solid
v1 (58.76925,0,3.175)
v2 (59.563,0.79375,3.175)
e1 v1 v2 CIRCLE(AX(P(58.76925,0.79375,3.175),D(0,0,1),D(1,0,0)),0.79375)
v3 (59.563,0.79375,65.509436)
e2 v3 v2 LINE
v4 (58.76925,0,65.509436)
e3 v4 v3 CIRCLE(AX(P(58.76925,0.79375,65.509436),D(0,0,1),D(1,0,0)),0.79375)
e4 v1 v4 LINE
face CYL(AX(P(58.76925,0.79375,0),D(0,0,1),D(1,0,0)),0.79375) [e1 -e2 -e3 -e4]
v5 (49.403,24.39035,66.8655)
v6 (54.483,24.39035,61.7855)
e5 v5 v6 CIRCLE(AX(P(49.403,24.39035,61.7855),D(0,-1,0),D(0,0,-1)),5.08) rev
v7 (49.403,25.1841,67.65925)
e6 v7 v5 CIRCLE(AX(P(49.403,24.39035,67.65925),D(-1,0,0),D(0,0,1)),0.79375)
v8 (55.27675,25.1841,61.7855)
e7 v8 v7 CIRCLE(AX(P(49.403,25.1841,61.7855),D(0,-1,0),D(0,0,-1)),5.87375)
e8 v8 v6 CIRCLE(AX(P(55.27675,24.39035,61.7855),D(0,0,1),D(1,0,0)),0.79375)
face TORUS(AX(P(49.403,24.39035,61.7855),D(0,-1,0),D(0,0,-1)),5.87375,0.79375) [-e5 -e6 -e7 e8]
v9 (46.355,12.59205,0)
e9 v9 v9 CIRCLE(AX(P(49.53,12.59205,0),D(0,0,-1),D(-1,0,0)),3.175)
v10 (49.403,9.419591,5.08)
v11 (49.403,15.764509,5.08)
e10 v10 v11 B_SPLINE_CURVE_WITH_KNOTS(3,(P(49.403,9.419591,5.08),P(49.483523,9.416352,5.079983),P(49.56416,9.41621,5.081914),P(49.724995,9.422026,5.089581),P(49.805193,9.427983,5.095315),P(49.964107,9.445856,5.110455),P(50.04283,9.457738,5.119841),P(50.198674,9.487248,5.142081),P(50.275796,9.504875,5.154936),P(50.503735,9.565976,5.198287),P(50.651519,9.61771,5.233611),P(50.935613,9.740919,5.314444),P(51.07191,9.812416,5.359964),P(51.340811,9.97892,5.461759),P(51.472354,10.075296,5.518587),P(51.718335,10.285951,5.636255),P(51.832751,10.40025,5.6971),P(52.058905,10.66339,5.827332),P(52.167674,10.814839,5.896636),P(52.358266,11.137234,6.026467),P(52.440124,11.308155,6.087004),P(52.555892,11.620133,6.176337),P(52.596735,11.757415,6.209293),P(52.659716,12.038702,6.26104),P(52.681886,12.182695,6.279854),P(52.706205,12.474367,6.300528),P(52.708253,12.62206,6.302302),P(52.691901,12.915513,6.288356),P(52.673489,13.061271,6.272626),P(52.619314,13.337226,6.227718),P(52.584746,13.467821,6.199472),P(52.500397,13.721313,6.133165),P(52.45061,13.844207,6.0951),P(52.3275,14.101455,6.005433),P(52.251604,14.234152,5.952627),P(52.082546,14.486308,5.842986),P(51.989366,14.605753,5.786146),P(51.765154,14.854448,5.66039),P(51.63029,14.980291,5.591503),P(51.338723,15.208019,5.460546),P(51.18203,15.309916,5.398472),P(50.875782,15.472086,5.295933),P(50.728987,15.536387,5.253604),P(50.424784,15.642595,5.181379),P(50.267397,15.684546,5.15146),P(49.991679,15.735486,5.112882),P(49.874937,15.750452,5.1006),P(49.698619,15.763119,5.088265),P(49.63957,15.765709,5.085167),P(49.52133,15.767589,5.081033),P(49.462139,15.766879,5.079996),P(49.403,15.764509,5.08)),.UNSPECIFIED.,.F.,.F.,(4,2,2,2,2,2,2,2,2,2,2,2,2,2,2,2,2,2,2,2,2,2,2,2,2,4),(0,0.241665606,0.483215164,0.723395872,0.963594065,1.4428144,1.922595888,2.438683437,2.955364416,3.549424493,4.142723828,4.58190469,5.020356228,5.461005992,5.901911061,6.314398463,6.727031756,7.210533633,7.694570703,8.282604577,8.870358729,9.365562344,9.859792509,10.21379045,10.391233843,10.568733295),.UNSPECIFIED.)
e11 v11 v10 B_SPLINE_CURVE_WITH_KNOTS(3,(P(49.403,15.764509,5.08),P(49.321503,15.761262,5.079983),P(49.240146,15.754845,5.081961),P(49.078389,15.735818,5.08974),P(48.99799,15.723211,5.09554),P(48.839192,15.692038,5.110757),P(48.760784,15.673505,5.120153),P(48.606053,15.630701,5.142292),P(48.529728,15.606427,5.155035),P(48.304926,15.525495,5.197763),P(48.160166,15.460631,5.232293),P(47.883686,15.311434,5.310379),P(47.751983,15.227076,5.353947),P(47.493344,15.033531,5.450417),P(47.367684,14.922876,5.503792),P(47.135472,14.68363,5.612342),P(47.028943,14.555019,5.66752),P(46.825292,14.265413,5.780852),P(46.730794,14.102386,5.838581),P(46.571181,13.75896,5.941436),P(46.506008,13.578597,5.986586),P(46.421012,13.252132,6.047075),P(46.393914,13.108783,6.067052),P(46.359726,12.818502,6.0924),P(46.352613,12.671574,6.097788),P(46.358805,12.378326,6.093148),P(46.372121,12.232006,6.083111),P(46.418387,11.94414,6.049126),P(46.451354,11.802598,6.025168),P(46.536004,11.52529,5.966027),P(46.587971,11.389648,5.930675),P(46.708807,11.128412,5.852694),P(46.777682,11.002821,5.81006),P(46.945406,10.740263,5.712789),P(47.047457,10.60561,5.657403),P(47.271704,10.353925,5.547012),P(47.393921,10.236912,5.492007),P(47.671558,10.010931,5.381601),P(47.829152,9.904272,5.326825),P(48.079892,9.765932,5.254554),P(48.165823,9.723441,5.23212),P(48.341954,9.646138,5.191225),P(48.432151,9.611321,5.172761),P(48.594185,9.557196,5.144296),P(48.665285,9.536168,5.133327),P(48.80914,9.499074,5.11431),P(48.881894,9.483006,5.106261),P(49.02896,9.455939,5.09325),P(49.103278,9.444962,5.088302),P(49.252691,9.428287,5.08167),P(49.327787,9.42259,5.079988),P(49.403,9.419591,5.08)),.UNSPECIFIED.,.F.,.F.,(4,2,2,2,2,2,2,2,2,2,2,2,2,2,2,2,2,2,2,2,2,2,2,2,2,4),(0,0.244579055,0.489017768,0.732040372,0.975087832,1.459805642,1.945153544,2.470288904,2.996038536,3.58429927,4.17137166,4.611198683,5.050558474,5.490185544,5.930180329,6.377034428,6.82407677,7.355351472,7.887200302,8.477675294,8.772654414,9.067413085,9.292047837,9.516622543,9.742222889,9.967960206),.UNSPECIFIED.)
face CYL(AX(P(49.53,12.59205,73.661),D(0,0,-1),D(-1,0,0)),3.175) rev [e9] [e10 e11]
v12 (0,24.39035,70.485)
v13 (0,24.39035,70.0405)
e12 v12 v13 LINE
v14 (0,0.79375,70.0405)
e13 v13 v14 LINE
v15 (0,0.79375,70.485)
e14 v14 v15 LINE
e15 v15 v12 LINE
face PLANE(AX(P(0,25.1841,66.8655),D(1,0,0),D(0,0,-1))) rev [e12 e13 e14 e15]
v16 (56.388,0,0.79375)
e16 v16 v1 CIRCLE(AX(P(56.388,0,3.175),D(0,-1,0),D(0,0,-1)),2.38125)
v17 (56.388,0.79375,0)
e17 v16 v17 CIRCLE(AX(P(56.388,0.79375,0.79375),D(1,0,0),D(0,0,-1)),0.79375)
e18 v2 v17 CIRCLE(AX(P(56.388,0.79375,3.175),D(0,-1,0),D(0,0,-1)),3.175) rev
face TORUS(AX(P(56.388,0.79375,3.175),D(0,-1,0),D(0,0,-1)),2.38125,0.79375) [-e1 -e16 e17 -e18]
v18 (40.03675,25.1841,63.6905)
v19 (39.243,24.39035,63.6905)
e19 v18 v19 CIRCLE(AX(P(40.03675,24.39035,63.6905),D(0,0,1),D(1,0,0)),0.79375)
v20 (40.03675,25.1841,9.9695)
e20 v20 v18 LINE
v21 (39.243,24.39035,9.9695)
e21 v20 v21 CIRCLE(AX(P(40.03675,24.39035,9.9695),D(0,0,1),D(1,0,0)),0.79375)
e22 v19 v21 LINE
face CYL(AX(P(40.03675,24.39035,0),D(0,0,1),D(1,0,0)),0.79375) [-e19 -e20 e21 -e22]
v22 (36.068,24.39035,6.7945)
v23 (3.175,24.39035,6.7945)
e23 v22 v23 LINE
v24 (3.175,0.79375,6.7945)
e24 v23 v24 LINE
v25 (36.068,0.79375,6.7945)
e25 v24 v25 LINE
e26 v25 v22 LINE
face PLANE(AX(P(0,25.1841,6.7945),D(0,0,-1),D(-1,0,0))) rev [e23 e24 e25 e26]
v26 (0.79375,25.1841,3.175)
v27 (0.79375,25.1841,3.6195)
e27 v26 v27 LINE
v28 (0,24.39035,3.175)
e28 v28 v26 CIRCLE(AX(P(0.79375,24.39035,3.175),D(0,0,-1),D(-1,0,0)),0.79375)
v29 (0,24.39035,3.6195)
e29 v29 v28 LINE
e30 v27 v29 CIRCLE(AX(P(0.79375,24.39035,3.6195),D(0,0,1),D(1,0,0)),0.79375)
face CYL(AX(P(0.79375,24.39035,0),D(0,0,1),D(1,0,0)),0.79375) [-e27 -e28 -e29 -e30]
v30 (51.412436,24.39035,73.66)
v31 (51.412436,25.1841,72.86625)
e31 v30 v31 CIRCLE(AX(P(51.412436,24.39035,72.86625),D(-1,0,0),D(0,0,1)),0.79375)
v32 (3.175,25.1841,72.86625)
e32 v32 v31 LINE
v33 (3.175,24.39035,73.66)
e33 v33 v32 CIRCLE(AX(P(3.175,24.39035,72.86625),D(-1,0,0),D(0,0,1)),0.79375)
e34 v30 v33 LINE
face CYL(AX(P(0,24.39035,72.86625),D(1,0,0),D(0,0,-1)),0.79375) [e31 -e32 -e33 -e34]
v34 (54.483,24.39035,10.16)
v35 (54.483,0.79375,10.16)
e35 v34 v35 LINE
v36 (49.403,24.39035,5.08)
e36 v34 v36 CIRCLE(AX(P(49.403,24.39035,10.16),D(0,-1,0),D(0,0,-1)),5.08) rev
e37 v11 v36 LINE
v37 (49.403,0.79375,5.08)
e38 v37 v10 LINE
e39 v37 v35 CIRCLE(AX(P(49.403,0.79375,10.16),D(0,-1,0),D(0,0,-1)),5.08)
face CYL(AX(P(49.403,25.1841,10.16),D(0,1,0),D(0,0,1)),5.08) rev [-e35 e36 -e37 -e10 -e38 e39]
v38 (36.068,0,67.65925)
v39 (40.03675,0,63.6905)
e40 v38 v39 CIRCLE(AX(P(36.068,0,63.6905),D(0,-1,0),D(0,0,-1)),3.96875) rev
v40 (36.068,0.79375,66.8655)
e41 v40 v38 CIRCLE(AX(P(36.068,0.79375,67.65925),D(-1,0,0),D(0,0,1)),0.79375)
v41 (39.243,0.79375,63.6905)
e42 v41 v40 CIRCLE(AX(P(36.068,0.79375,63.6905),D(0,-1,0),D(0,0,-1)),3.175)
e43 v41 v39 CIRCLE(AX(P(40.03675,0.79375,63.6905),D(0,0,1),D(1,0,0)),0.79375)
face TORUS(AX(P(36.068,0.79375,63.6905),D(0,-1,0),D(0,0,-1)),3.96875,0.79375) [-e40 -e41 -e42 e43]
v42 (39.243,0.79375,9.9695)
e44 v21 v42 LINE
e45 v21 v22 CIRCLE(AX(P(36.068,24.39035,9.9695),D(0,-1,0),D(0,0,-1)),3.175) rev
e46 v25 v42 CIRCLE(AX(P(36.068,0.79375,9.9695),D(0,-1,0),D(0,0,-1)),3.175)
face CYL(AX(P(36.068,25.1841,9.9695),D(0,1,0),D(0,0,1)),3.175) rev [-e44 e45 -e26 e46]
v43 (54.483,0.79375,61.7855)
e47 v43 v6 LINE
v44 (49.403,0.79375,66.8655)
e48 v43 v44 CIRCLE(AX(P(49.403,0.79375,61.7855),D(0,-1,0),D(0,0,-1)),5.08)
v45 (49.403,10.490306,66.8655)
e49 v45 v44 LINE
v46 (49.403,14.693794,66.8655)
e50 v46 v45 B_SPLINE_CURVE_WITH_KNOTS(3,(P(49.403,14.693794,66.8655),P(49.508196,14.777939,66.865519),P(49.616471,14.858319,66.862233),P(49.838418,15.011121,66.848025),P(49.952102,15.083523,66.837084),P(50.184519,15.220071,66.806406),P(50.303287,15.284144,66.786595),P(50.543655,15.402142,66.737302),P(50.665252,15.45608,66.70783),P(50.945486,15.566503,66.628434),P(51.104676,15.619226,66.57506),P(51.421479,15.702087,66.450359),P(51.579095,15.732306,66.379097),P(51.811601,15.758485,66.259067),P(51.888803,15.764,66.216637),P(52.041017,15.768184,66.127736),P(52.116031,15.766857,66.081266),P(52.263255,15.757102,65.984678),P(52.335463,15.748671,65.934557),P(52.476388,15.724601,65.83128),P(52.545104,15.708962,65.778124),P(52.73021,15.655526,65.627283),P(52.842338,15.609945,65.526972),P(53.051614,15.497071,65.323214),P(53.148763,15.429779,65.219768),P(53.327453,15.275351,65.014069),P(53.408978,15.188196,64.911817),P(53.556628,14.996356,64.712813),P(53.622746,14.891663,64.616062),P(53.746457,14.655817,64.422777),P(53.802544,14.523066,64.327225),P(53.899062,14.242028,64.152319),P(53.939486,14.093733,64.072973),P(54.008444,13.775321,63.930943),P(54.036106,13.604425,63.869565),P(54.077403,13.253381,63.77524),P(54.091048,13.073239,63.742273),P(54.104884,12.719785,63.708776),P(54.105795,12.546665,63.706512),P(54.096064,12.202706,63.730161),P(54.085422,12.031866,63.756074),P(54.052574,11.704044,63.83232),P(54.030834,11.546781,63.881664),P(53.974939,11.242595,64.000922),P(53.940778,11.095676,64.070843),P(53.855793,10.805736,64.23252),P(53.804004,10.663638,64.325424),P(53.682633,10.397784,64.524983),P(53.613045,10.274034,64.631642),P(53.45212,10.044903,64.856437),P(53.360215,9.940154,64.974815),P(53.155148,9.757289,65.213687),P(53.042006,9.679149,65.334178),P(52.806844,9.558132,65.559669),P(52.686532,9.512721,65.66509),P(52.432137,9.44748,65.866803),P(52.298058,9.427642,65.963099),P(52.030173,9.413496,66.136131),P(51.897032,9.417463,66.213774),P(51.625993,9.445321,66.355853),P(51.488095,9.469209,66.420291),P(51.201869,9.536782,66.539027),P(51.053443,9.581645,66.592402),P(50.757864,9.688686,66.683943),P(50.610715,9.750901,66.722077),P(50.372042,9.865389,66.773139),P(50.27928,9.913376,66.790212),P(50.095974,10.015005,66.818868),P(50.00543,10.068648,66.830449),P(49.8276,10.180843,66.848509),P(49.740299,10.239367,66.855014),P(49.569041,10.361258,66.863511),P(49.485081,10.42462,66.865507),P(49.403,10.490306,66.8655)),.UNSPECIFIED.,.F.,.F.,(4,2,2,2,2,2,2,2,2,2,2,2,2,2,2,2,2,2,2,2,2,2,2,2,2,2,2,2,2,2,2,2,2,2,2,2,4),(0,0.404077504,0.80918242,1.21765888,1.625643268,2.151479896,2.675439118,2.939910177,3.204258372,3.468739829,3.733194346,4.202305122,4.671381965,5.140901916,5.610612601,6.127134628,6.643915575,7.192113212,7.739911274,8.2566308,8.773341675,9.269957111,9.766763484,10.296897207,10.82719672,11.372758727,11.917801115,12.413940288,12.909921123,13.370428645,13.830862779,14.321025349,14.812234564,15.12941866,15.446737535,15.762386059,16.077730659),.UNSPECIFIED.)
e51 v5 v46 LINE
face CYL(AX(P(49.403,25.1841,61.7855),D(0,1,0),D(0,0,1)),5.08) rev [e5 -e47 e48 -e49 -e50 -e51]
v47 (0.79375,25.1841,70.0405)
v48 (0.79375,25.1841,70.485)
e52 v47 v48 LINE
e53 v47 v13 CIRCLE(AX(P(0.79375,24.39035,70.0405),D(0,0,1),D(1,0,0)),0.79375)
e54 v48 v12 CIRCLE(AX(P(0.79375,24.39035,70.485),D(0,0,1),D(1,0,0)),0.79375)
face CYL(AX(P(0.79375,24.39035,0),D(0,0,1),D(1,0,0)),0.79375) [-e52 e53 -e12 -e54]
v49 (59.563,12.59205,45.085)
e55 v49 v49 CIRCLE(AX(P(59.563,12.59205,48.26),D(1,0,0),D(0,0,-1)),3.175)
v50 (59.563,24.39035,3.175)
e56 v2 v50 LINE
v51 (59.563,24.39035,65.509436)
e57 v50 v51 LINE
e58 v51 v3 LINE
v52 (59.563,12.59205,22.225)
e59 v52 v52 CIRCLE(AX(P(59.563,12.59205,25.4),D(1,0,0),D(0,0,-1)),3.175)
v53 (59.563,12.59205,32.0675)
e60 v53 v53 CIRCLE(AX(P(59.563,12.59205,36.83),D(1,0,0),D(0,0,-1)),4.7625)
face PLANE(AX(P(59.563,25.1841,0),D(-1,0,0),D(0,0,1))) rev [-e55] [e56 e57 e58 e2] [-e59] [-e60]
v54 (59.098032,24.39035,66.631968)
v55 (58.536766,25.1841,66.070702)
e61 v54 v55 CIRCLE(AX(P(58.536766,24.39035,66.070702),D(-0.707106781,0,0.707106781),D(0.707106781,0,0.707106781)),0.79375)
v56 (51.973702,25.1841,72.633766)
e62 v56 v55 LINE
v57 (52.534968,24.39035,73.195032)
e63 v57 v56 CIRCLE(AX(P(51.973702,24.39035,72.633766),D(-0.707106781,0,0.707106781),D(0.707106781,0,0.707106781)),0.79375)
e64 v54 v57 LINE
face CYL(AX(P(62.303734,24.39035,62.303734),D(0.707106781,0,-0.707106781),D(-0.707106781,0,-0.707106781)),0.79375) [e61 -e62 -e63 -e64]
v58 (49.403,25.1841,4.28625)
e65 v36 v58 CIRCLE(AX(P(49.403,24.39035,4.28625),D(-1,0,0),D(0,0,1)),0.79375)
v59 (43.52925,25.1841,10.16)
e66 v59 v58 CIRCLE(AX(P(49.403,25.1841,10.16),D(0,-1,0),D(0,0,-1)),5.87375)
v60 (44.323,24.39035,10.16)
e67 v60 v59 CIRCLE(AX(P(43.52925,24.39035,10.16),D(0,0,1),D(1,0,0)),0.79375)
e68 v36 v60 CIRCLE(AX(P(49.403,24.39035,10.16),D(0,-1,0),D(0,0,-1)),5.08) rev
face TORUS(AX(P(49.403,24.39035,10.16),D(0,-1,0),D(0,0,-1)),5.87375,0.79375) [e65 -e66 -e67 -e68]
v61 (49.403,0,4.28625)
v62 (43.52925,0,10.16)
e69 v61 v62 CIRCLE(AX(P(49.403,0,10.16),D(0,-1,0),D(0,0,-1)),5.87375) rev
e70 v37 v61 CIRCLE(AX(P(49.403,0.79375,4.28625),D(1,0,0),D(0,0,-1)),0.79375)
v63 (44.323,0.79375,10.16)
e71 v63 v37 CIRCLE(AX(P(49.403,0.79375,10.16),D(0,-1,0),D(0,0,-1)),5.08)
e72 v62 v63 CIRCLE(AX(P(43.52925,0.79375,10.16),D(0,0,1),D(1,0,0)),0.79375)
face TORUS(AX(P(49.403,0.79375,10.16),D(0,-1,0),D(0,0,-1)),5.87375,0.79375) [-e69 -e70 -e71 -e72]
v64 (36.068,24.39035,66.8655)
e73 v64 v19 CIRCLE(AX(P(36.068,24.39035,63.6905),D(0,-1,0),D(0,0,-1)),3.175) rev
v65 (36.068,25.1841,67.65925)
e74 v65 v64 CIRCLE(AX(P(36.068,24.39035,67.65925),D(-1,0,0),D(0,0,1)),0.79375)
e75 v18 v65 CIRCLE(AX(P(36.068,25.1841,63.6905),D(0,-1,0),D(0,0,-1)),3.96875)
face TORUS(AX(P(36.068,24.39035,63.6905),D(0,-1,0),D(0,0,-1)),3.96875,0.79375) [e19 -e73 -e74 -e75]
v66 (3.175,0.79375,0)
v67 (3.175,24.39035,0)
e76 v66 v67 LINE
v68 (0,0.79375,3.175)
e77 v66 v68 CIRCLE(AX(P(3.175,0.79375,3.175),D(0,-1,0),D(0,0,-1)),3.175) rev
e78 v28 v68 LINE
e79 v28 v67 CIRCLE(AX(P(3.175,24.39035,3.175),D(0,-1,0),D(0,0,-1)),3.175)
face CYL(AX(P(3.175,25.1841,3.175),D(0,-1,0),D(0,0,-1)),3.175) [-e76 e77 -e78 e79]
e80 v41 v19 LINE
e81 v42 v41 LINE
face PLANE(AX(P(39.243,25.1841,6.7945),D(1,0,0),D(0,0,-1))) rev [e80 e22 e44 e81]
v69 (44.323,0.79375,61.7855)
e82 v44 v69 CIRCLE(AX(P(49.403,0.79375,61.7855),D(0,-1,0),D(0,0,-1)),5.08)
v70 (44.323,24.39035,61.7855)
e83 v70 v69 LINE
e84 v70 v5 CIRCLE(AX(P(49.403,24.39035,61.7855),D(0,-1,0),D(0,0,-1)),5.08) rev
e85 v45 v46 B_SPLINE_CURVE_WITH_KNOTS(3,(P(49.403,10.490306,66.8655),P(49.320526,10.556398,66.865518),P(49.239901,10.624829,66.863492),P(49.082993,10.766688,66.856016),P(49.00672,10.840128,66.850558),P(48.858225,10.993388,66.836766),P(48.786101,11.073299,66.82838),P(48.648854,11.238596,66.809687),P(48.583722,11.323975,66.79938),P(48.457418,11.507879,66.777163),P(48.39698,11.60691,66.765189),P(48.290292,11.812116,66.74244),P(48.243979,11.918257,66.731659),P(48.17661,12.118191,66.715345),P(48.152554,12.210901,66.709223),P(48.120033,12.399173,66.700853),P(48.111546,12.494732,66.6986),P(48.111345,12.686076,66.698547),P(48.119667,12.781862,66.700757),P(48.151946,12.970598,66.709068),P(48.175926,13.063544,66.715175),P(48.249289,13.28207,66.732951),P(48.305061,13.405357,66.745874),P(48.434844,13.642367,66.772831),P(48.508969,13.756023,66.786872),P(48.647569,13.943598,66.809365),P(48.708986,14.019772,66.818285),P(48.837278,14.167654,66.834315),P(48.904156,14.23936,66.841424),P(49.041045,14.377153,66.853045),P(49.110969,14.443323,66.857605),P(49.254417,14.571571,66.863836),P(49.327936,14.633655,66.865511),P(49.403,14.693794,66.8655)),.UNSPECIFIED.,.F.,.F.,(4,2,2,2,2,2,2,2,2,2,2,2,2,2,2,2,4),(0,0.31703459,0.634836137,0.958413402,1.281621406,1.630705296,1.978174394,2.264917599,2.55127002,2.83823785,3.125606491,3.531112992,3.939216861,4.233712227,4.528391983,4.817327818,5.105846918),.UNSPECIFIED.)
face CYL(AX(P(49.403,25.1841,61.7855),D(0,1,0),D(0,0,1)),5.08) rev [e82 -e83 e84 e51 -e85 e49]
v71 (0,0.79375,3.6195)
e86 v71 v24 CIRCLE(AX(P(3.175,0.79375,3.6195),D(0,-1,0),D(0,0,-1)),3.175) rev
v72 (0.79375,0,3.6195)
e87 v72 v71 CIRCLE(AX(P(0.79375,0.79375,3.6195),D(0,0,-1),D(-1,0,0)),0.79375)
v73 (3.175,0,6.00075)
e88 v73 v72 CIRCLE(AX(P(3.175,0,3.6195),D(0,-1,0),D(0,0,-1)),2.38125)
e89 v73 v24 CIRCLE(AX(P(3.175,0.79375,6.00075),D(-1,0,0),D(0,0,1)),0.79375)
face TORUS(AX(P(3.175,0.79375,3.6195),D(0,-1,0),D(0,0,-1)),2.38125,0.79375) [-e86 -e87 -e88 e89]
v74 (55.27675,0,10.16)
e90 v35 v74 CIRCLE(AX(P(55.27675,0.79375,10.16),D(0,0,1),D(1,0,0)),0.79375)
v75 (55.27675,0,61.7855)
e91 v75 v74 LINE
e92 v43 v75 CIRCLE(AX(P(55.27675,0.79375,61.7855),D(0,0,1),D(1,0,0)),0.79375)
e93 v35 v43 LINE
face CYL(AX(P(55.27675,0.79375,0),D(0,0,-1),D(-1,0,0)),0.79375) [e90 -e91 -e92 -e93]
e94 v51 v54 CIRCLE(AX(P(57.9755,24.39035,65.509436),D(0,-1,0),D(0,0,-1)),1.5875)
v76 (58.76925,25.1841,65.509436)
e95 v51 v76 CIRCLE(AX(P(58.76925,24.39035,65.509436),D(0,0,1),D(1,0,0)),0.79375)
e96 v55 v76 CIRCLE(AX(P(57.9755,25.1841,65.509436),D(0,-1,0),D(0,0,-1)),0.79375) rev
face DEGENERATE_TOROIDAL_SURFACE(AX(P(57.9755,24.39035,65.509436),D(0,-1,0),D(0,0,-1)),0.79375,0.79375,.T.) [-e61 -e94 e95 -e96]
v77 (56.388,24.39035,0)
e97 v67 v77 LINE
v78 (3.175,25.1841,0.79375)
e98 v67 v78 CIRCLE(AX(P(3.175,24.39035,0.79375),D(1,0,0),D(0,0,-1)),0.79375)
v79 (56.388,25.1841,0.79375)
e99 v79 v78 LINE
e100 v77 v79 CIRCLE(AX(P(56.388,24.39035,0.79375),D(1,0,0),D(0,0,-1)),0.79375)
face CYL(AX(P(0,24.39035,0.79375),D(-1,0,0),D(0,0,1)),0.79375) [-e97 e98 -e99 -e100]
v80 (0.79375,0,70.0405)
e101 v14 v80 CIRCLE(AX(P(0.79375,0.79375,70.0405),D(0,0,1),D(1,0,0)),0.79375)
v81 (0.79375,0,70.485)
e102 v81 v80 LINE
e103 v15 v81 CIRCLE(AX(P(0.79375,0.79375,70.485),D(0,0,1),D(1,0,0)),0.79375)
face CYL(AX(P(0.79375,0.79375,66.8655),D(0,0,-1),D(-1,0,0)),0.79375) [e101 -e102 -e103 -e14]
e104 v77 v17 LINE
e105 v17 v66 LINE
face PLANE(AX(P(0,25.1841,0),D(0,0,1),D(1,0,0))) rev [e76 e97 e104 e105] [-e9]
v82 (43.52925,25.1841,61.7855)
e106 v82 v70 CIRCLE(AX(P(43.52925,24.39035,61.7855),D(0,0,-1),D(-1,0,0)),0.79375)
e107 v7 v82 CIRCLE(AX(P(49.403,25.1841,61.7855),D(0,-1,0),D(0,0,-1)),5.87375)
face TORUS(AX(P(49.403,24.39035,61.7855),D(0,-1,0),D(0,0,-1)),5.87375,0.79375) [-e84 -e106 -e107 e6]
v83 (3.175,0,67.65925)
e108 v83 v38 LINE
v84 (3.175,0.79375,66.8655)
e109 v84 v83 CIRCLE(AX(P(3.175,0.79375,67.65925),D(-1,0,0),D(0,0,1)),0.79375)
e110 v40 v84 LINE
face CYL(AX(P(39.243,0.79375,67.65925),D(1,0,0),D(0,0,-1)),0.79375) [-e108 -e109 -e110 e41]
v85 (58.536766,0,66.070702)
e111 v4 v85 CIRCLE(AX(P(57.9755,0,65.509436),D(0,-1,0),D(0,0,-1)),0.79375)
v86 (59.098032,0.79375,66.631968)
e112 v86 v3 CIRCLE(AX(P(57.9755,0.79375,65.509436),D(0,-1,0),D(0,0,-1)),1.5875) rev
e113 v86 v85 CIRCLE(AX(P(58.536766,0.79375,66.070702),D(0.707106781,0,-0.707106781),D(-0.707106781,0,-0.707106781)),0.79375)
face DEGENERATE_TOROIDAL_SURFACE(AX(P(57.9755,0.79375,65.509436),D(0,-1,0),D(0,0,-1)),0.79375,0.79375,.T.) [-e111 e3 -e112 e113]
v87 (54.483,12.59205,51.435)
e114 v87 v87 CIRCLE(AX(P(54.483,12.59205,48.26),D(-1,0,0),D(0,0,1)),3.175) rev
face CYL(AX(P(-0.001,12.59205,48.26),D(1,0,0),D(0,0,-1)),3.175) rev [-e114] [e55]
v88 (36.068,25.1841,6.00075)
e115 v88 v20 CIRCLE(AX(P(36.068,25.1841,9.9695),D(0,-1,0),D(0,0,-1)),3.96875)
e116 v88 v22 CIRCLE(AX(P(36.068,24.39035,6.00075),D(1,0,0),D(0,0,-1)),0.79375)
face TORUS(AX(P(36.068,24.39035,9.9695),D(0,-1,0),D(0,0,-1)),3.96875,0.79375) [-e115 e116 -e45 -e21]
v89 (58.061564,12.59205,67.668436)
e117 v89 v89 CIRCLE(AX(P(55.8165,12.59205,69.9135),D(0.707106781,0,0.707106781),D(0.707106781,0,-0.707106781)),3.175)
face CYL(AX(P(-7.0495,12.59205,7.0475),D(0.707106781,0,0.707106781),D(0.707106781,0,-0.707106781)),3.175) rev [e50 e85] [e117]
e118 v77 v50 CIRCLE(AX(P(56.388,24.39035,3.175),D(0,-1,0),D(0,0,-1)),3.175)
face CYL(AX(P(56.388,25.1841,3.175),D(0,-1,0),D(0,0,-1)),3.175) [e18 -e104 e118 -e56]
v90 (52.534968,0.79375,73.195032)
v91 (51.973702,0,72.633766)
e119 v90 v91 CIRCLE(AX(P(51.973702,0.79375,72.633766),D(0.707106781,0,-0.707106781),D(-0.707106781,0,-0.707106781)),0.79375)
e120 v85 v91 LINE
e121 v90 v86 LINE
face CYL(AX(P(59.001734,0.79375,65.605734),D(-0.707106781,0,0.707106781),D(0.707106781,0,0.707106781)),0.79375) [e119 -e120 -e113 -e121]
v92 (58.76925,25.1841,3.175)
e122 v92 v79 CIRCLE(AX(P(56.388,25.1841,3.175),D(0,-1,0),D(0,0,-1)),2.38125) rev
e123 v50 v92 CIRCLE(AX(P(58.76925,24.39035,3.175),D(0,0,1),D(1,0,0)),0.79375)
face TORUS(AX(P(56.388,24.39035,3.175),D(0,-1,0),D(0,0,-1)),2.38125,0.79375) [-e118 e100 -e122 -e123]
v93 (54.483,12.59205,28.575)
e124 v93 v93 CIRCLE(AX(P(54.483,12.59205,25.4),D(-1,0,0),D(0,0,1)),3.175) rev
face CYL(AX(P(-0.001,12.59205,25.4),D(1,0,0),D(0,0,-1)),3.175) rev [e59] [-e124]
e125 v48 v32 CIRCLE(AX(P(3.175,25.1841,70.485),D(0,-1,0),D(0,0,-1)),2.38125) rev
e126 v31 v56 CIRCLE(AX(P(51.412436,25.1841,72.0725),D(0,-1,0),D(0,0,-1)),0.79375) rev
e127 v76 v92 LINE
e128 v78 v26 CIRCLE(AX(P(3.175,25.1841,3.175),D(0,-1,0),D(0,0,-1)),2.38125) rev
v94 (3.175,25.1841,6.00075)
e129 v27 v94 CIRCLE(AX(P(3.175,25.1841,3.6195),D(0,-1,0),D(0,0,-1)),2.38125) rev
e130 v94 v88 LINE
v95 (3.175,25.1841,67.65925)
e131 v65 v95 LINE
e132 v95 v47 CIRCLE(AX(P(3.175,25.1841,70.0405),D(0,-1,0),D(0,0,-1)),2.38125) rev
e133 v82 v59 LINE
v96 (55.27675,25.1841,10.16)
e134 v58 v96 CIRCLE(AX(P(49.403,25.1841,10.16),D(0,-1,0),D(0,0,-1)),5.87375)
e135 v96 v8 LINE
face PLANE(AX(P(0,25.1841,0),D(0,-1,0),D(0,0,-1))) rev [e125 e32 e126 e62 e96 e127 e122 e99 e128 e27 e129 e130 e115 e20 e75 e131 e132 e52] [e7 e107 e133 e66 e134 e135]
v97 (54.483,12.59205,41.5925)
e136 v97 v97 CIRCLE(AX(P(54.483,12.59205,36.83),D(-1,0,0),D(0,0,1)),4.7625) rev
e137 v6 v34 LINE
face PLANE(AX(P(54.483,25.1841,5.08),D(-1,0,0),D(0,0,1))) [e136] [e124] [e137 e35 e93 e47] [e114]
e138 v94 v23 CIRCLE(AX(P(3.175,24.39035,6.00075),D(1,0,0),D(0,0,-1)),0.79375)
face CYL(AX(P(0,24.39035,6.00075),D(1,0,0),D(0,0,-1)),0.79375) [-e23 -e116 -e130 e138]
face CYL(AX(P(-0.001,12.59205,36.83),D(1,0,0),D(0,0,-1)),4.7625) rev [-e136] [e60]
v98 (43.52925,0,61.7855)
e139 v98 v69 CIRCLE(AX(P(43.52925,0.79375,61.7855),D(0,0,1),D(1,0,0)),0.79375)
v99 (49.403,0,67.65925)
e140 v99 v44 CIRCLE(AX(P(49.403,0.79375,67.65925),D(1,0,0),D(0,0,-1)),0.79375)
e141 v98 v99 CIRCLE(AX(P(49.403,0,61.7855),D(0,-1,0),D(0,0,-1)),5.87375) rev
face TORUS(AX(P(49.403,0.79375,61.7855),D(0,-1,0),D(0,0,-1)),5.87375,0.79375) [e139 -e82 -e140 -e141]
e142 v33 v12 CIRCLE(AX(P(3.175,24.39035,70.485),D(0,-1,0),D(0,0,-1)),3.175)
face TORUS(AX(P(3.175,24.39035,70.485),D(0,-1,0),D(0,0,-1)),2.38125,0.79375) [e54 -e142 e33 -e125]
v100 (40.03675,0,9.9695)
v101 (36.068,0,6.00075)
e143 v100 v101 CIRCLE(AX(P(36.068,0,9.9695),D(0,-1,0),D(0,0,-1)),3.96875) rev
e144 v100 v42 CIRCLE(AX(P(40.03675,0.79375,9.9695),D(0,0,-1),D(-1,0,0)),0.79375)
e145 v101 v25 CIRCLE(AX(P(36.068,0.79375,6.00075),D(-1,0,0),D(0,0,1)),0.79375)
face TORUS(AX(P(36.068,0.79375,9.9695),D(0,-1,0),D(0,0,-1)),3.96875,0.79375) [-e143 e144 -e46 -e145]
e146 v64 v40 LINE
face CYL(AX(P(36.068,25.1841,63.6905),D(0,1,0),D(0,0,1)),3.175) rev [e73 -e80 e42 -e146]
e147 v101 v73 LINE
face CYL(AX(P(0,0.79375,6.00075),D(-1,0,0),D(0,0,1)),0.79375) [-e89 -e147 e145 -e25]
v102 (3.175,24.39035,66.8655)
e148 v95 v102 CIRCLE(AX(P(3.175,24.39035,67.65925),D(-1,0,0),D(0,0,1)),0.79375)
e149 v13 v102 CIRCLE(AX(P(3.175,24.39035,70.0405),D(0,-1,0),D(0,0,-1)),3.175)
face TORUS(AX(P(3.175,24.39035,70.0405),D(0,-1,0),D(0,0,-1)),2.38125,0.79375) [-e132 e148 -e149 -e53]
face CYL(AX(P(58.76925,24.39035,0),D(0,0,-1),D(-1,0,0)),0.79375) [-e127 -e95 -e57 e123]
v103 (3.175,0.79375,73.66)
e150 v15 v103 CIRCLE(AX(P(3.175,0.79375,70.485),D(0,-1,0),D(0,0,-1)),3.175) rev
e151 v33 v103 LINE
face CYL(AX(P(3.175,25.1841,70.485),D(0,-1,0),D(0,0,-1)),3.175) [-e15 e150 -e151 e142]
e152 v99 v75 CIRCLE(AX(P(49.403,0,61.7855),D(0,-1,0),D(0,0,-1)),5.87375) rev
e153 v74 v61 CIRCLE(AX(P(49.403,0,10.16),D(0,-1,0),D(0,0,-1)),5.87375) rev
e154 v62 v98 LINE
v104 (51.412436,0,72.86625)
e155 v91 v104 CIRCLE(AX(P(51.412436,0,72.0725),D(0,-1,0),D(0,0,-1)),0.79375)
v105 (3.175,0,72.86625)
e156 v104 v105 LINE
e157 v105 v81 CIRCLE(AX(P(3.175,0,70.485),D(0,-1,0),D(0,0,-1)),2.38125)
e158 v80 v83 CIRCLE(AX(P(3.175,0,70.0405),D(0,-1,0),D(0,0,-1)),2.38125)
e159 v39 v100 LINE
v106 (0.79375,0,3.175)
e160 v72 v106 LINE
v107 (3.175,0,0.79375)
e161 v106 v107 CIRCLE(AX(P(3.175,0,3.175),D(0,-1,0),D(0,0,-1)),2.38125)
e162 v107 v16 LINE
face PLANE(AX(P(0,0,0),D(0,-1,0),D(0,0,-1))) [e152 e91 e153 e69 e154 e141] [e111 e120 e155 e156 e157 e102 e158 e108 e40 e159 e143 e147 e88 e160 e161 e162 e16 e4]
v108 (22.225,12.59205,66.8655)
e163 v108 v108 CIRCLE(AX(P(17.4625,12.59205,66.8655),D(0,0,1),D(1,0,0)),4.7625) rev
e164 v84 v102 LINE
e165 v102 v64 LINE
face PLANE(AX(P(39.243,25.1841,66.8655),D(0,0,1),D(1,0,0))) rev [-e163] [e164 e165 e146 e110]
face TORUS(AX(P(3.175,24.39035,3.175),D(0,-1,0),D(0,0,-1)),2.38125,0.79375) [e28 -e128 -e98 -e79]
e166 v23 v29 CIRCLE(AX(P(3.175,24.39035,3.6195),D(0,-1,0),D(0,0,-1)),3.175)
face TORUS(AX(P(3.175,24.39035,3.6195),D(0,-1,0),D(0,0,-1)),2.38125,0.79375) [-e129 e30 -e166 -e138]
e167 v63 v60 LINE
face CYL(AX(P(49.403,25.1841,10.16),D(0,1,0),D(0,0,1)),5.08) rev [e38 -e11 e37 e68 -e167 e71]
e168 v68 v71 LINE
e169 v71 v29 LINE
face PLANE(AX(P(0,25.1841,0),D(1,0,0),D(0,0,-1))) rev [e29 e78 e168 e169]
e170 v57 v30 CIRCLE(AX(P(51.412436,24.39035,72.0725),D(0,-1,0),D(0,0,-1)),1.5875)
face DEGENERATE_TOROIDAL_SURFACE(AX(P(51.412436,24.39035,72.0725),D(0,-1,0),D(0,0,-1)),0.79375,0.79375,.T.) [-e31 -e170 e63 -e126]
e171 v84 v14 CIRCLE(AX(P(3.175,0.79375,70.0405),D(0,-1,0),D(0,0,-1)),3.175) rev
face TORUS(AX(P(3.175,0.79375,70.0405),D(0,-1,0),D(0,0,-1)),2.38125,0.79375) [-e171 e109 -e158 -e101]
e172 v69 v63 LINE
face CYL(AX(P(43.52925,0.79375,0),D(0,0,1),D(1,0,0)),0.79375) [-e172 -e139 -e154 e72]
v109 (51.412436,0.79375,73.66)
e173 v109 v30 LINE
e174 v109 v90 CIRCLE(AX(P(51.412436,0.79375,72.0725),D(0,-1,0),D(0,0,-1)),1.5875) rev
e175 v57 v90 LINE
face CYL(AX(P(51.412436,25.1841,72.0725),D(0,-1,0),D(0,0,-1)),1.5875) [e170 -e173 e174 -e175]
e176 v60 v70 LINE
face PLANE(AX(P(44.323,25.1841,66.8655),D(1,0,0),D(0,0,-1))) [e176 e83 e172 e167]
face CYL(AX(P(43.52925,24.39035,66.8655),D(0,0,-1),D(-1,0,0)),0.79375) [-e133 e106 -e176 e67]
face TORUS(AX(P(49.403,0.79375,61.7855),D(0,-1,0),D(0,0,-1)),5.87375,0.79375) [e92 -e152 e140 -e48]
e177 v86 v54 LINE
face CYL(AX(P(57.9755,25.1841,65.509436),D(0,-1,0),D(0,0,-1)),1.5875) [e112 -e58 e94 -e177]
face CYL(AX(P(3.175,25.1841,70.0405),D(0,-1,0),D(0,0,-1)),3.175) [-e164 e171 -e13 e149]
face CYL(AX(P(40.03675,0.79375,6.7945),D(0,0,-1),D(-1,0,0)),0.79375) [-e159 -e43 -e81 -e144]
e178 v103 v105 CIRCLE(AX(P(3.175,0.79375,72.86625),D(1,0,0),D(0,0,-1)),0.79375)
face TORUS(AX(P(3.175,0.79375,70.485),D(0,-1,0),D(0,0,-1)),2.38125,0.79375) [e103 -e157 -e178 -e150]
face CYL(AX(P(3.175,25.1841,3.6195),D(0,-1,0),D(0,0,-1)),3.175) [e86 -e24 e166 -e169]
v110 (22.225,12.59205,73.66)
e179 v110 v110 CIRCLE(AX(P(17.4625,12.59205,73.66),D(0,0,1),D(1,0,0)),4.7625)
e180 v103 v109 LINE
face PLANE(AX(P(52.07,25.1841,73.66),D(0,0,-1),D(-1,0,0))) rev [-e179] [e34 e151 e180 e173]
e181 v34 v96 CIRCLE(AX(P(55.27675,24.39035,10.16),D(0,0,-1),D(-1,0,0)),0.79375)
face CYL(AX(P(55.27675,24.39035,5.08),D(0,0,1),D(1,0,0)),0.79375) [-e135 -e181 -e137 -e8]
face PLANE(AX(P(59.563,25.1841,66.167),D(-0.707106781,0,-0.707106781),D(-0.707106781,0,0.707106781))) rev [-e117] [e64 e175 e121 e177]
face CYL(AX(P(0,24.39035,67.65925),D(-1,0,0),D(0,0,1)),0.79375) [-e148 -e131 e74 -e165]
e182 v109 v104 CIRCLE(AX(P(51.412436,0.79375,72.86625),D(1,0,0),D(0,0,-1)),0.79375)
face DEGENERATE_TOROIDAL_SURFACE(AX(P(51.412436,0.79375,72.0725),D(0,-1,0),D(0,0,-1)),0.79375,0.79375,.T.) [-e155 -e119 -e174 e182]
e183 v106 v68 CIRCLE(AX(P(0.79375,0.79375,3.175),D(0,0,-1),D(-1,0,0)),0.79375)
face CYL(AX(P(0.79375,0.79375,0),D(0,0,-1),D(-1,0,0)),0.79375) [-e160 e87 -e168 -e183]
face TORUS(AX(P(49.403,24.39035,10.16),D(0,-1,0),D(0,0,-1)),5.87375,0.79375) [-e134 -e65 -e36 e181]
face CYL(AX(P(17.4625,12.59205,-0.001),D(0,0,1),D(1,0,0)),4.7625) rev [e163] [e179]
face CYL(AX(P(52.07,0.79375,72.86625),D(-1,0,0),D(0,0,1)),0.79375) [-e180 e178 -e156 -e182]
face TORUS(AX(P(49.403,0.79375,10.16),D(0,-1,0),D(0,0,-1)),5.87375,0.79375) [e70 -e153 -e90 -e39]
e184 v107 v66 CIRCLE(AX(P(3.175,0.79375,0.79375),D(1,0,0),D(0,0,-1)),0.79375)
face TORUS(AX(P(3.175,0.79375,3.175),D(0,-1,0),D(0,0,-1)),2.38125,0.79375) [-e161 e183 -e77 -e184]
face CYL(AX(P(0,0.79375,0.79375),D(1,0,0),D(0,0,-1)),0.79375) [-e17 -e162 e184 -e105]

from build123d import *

# Parameters (mm, degrees)
SKETCH1_W               = 10.16
SKETCH1_H               = 61.7855
BOSS_EXTRUDE1_DEPTH     = 25.1841
FILLET2_R               = 5.08
CUT_EXTRUDE1_REACH      = 100.019
SKETCH2_R               = 4.7625
CUT_EXTRUDE2_REACH      = 94.403
CUT_EXTRUDE2_END_RADIUS = 5.08
SKETCH3_R               = 3.175
CUT_EXTRUDE3_REACH      = 100.019
CUT_EXTRUDE4_REACH      = 100.019
CUT_EXTRUDE4_END_RADIUS = 5.08
SKETCH6_R               = 3.175
FILLET3_R               = 3.175
FILLET4_R               = 1.5875
FILLET5_R               = 0.79375


with BuildPart() as part:
    # Sketch1 → Boss-Extrude1 (new body)
    with BuildSketch(Plane(origin=(0, 0, 0), x_dir=(1, 0, 0), z_dir=(0, 1, 0))):
        Polygon((0, 0), (0, -6.7945), (39.243, -6.7945), (39.243, -66.8655), (0, -66.8655), (0, -73.66), (52.07, -73.66), (59.563, -66.167), (59.563, 0), align=None)
        with Locations((49.403, -35.97275)):
            Rectangle(SKETCH1_W, SKETCH1_H, mode=Mode.SUBTRACT)
    extrude(amount=BOSS_EXTRUDE1_DEPTH)

    # Fillet2
    fillet2_edges = [part.edges().sort_by_distance(p)[0] for p in [
        (44.323, 12.59205, 5.08),
        (54.483, 12.59205, 5.08),
        (44.323, 12.59205, 66.8655),
        (54.483, 12.59205, 66.8655),
    ]]
    fillet(fillet2_edges, radius=FILLET2_R - 0.0001)  # a hair under: the kernel refuses the full size

    # Sketch2 → Cut-Extrude1 (cut, up to next)
    with BuildSketch(Plane.XY.offset(73.66), mode=Mode.PRIVATE) as cut_extrude1_sk1:
        with Locations((17.4625, 12.59205)):
            Circle(SKETCH2_R)
    cut_extrude1_tool1 = extrude(cut_extrude1_sk1.sketch, amount=-CUT_EXTRUDE1_REACH, mode=Mode.PRIVATE) & part.part
    add(cut_extrude1_tool1.solids().sort_by_distance((17.4625, 12.59205, 73.66))[0], mode=Mode.SUBTRACT)

    # Cut-Extrude2: up to this cylinder (the profile starts outside it)
    cut_extrude2_end = Plane(origin=(49.403, 12.59205, 61.7855), z_dir=(0, 1, 0)) * Cylinder(CUT_EXTRUDE2_END_RADIUS, 199.966, mode=Mode.PRIVATE)
    # Sketch3 → Cut-Extrude2 (cut, up to the surface)
    with BuildSketch(Plane(origin=(62.865, 0, 62.865), x_dir=(0.707106781186546, 0, -0.707106781186549), z_dir=(0.707106781186549, 0, 0.707106781186546)), mode=Mode.PRIVATE) as cut_extrude2_sk1:
        with Locations((-9.968084294, 12.59205)):
            Circle(SKETCH3_R)
    cut_extrude2_tool1 = extrude(cut_extrude2_sk1.sketch, amount=-CUT_EXTRUDE2_REACH, mode=Mode.PRIVATE) - cut_extrude2_end
    add(cut_extrude2_tool1.solids().sort_by_distance((55.8165, 12.59205, 69.9135))[0], mode=Mode.SUBTRACT)

    # Sketch4 → Cut-Extrude3 (cut, up to next)
    with BuildSketch(Plane(origin=(59.563, 0, 0), x_dir=(0, 0, -1), z_dir=(1, 0, 0)), mode=Mode.PRIVATE) as cut_extrude3_sk1:
        with BuildLine():
            ThreePointArc((-41.5925, 12.59205), (-36.83, 7.82955), (-32.0675, 12.59205))
            Line((-32.0675, 12.59205), (-41.5925, 12.59205))
        make_face()
    cut_extrude3_tool1 = extrude(cut_extrude3_sk1.sketch, amount=-CUT_EXTRUDE3_REACH, mode=Mode.PRIVATE) & part.part
    # Sketch4 → Cut-Extrude3 (cut, up to next)
    with BuildSketch(Plane(origin=(59.563, 0, 0), x_dir=(0, 0, -1), z_dir=(1, 0, 0)), mode=Mode.PRIVATE) as cut_extrude3_sk2:
        with BuildLine():
            Line((-41.5925, 12.59205), (-32.0675, 12.59205))
            ThreePointArc((-32.0675, 12.59205), (-36.83, 17.35455), (-41.5925, 12.59205))
        make_face()
    cut_extrude3_tool2 = extrude(cut_extrude3_sk2.sketch, amount=-CUT_EXTRUDE3_REACH, mode=Mode.PRIVATE) & part.part
    # Sketch4 → Cut-Extrude3 (cut, up to next)
    with BuildSketch(Plane(origin=(59.563, 0, 0), x_dir=(0, 0, -1), z_dir=(1, 0, 0)), mode=Mode.PRIVATE) as cut_extrude3_sk3:
        with BuildLine():
            ThreePointArc((-41.5925, 12.59205), (-36.83, 7.82955), (-32.0675, 12.59205))
            Line((-32.0675, 12.59205), (-41.5925, 12.59205))
        make_face()
    cut_extrude3_tool3 = extrude(cut_extrude3_sk3.sketch, amount=-CUT_EXTRUDE3_REACH, mode=Mode.PRIVATE) & part.part
    # Sketch4 → Cut-Extrude3 (cut, up to next)
    with BuildSketch(Plane(origin=(59.563, 0, 0), x_dir=(0, 0, -1), z_dir=(1, 0, 0)), mode=Mode.PRIVATE) as cut_extrude3_sk4:
        with BuildLine():
            Line((-41.5925, 12.59205), (-32.0675, 12.59205))
            ThreePointArc((-32.0675, 12.59205), (-36.83, 17.35455), (-41.5925, 12.59205))
        make_face()
    cut_extrude3_tool4 = extrude(cut_extrude3_sk4.sketch, amount=-CUT_EXTRUDE3_REACH, mode=Mode.PRIVATE) & part.part
    # Sketch4 → Cut-Extrude3 (cut, up to next)
    with BuildSketch(Plane(origin=(59.563, 0, 0), x_dir=(0, 0, -1), z_dir=(1, 0, 0)), mode=Mode.PRIVATE) as cut_extrude3_sk5:
        with BuildLine():
            ThreePointArc((-28.575, 12.59205), (-25.4, 9.41705), (-22.225, 12.59205))
            Line((-22.225, 12.59205), (-28.575, 12.59205))
        make_face()
    cut_extrude3_tool5 = extrude(cut_extrude3_sk5.sketch, amount=-CUT_EXTRUDE3_REACH, mode=Mode.PRIVATE) & part.part
    # Sketch4 → Cut-Extrude3 (cut, up to next)
    with BuildSketch(Plane(origin=(59.563, 0, 0), x_dir=(0, 0, -1), z_dir=(1, 0, 0)), mode=Mode.PRIVATE) as cut_extrude3_sk6:
        with BuildLine():
            Line((-28.575, 12.59205), (-22.225, 12.59205))
            ThreePointArc((-22.225, 12.59205), (-25.4, 15.76705), (-28.575, 12.59205))
        make_face()
    cut_extrude3_tool6 = extrude(cut_extrude3_sk6.sketch, amount=-CUT_EXTRUDE3_REACH, mode=Mode.PRIVATE) & part.part
    # Sketch4 → Cut-Extrude3 (cut, up to next)
    with BuildSketch(Plane(origin=(59.563, 0, 0), x_dir=(0, 0, -1), z_dir=(1, 0, 0)), mode=Mode.PRIVATE) as cut_extrude3_sk7:
        with BuildLine():
            ThreePointArc((-28.575, 12.59205), (-25.4, 9.41705), (-22.225, 12.59205))
            Line((-22.225, 12.59205), (-28.575, 12.59205))
        make_face()
    cut_extrude3_tool7 = extrude(cut_extrude3_sk7.sketch, amount=-CUT_EXTRUDE3_REACH, mode=Mode.PRIVATE) & part.part
    # Sketch4 → Cut-Extrude3 (cut, up to next)
    with BuildSketch(Plane(origin=(59.563, 0, 0), x_dir=(0, 0, -1), z_dir=(1, 0, 0)), mode=Mode.PRIVATE) as cut_extrude3_sk8:
        with BuildLine():
            Line((-28.575, 12.59205), (-22.225, 12.59205))
            ThreePointArc((-22.225, 12.59205), (-25.4, 15.76705), (-28.575, 12.59205))
        make_face()
    cut_extrude3_tool8 = extrude(cut_extrude3_sk8.sketch, amount=-CUT_EXTRUDE3_REACH, mode=Mode.PRIVATE) & part.part
    # Sketch4 → Cut-Extrude3 (cut, up to next)
    with BuildSketch(Plane(origin=(59.563, 0, 0), x_dir=(0, 0, -1), z_dir=(1, 0, 0)), mode=Mode.PRIVATE) as cut_extrude3_sk9:
        with BuildLine():
            ThreePointArc((-51.435, 12.59205), (-48.26, 9.41705), (-45.085, 12.59205))
            Line((-45.085, 12.59205), (-51.435, 12.59205))
        make_face()
    cut_extrude3_tool9 = extrude(cut_extrude3_sk9.sketch, amount=-CUT_EXTRUDE3_REACH, mode=Mode.PRIVATE) & part.part
    # Sketch4 → Cut-Extrude3 (cut, up to next)
    with BuildSketch(Plane(origin=(59.563, 0, 0), x_dir=(0, 0, -1), z_dir=(1, 0, 0)), mode=Mode.PRIVATE) as cut_extrude3_sk10:
        with BuildLine():
            Line((-51.435, 12.59205), (-45.085, 12.59205))
            ThreePointArc((-45.085, 12.59205), (-48.26, 15.76705), (-51.435, 12.59205))
        make_face()
    cut_extrude3_tool10 = extrude(cut_extrude3_sk10.sketch, amount=-CUT_EXTRUDE3_REACH, mode=Mode.PRIVATE) & part.part
    # Sketch4 → Cut-Extrude3 (cut, up to next)
    with BuildSketch(Plane(origin=(59.563, 0, 0), x_dir=(0, 0, -1), z_dir=(1, 0, 0)), mode=Mode.PRIVATE) as cut_extrude3_sk11:
        with BuildLine():
            ThreePointArc((-51.435, 12.59205), (-48.26, 9.41705), (-45.085, 12.59205))
            Line((-45.085, 12.59205), (-51.435, 12.59205))
        make_face()
    cut_extrude3_tool11 = extrude(cut_extrude3_sk11.sketch, amount=-CUT_EXTRUDE3_REACH, mode=Mode.PRIVATE) & part.part
    # Sketch4 → Cut-Extrude3 (cut, up to next)
    with BuildSketch(Plane(origin=(59.563, 0, 0), x_dir=(0, 0, -1), z_dir=(1, 0, 0)), mode=Mode.PRIVATE) as cut_extrude3_sk12:
        with BuildLine():
            Line((-51.435, 12.59205), (-45.085, 12.59205))
            ThreePointArc((-45.085, 12.59205), (-48.26, 15.76705), (-51.435, 12.59205))
        make_face()
    cut_extrude3_tool12 = extrude(cut_extrude3_sk12.sketch, amount=-CUT_EXTRUDE3_REACH, mode=Mode.PRIVATE) & part.part
    add(cut_extrude3_tool1.solids().sort_by_distance((59.563, 10.570782, 36.83))[0], mode=Mode.SUBTRACT)
    add(cut_extrude3_tool2.solids().sort_by_distance((59.563, 14.613318, 36.83))[0], mode=Mode.SUBTRACT)
    add(cut_extrude3_tool3.solids().sort_by_distance((59.563, 10.570782, 36.83))[0], mode=Mode.SUBTRACT)
    add(cut_extrude3_tool4.solids().sort_by_distance((59.563, 14.613318, 36.83))[0], mode=Mode.SUBTRACT)
    add(cut_extrude3_tool5.solids().sort_by_distance((59.563, 11.244538, 25.4))[0], mode=Mode.SUBTRACT)
    add(cut_extrude3_tool6.solids().sort_by_distance((59.563, 13.939562, 25.4))[0], mode=Mode.SUBTRACT)
    add(cut_extrude3_tool7.solids().sort_by_distance((59.563, 11.244538, 25.4))[0], mode=Mode.SUBTRACT)
    add(cut_extrude3_tool8.solids().sort_by_distance((59.563, 13.939562, 25.4))[0], mode=Mode.SUBTRACT)
    add(cut_extrude3_tool9.solids().sort_by_distance((59.563, 11.244538, 48.26))[0], mode=Mode.SUBTRACT)
    add(cut_extrude3_tool10.solids().sort_by_distance((59.563, 13.939562, 48.26))[0], mode=Mode.SUBTRACT)
    add(cut_extrude3_tool11.solids().sort_by_distance((59.563, 11.244538, 48.26))[0], mode=Mode.SUBTRACT)
    add(cut_extrude3_tool12.solids().sort_by_distance((59.563, 13.939562, 48.26))[0], mode=Mode.SUBTRACT)

    # Cut-Extrude4: up to this cylinder (the profile starts outside it)
    cut_extrude4_end = Plane(origin=(49.403, 12.59205, 10.16), z_dir=(0, 1, 0)) * Cylinder(CUT_EXTRUDE4_END_RADIUS, 211.198, mode=Mode.PRIVATE)
    # Sketch6 → Cut-Extrude4 (cut, up to the surface)
    with BuildSketch(Plane(origin=(0, 0, 0), x_dir=(-1, 0, 0), z_dir=(0, 0, -1)), mode=Mode.PRIVATE) as cut_extrude4_sk1:
        with Locations((-49.53, 12.59205)):
            Circle(SKETCH6_R)
    cut_extrude4_tool1 = extrude(cut_extrude4_sk1.sketch, amount=-CUT_EXTRUDE4_REACH, mode=Mode.PRIVATE) - cut_extrude4_end
    add(cut_extrude4_tool1.solids().sort_by_distance((49.53, 12.59205, 0))[0], mode=Mode.SUBTRACT)

    # Fillet3
    fillet3_edges = [part.edges().sort_by_distance(p)[0] for p in [
        (59.563, 12.59205, 0),
        (0, 12.59205, 73.66),
        (0, 12.59205, 66.8655),
        (39.243, 12.59205, 66.8655),
        (39.243, 12.59205, 6.7945),
        (0, 12.59205, 6.7945),
        (0, 12.59205, 0),
    ]]
    fillet(fillet3_edges, radius=FILLET3_R)

    # Fillet4
    fillet4_edges = [part.edges().sort_by_distance(p)[0] for p in [
        (59.563, 12.59205, 66.167),
        (52.07, 12.59205, 73.66),
    ]]
    fillet(fillet4_edges, radius=FILLET4_R)

    # Fillet5
    fillet5_edges = [part.edges().sort_by_distance(p)[0] for p in [
        (0, 25.1841, 3.39725),
        (19.6215, 25.1841, 6.7945),
        (39.243, 25.1841, 36.83),
        (19.6215, 25.1841, 66.8655),
        (0, 25.1841, 70.26275),
        (27.293717985, 25.1841, 73.66),
        (0.92993597, 25.1841, 0.92993597),
        (0.92993597, 25.1841, 5.86456403),
        (0.92993597, 25.1841, 67.79543597),
        (0.92993597, 25.1841, 72.73006403),
        (58.63306403, 25.1841, 0.92993597),
        (38.31306403, 0, 65.93556403),
        (38.31306403, 25.1841, 65.93556403),
        (38.31306403, 0, 7.72443597),
        (38.31306403, 25.1841, 7.72443597),
        (55.8165, 0, 69.9135),
        (55.8165, 25.1841, 69.9135),
        (59.563, 0, 34.342217985),
        (59.442158758, 0, 66.116945919),
        (52.019945919, 0, 73.539158758),
        (59.563, 25.1841, 34.342217985),
        (59.442158758, 25.1841, 66.116945919),
        (52.019945919, 25.1841, 73.539158758),
        (44.323, 0, 35.97275),
        (44.323, 25.1841, 35.97275),
        (54.483, 0, 35.97275),
        (54.483, 25.1841, 35.97275),
        (45.810868262, 0, 6.567868262),
        (45.810868262, 25.1841, 6.567868262),
        (52.995131738, 0, 6.567868262),
        (52.995131738, 25.1841, 6.567868262),
        (45.810868262, 0, 65.377631738),
        (45.810868262, 25.1841, 65.377631738),
        (52.995131738, 0, 65.377631738),
        (52.995131738, 25.1841, 65.377631738),
        (29.7815, 0, 0),
        (29.7815, 25.1841, 0),
        (27.293717985, 0, 73.66),
        (0, 0, 70.26275),
        (19.6215, 0, 66.8655),
        (39.243, 0, 36.83),
        (19.6215, 0, 6.7945),
        (0, 0, 3.39725),
        (0.92993597, 0, 0.92993597),
        (0.92993597, 0, 5.86456403),
        (0.92993597, 0, 67.79543597),
        (0.92993597, 0, 72.73006403),
        (58.63306403, 0, 0.92993597),
    ]]
    fillet(fillet5_edges, radius=FILLET5_R)


solid = part.part
